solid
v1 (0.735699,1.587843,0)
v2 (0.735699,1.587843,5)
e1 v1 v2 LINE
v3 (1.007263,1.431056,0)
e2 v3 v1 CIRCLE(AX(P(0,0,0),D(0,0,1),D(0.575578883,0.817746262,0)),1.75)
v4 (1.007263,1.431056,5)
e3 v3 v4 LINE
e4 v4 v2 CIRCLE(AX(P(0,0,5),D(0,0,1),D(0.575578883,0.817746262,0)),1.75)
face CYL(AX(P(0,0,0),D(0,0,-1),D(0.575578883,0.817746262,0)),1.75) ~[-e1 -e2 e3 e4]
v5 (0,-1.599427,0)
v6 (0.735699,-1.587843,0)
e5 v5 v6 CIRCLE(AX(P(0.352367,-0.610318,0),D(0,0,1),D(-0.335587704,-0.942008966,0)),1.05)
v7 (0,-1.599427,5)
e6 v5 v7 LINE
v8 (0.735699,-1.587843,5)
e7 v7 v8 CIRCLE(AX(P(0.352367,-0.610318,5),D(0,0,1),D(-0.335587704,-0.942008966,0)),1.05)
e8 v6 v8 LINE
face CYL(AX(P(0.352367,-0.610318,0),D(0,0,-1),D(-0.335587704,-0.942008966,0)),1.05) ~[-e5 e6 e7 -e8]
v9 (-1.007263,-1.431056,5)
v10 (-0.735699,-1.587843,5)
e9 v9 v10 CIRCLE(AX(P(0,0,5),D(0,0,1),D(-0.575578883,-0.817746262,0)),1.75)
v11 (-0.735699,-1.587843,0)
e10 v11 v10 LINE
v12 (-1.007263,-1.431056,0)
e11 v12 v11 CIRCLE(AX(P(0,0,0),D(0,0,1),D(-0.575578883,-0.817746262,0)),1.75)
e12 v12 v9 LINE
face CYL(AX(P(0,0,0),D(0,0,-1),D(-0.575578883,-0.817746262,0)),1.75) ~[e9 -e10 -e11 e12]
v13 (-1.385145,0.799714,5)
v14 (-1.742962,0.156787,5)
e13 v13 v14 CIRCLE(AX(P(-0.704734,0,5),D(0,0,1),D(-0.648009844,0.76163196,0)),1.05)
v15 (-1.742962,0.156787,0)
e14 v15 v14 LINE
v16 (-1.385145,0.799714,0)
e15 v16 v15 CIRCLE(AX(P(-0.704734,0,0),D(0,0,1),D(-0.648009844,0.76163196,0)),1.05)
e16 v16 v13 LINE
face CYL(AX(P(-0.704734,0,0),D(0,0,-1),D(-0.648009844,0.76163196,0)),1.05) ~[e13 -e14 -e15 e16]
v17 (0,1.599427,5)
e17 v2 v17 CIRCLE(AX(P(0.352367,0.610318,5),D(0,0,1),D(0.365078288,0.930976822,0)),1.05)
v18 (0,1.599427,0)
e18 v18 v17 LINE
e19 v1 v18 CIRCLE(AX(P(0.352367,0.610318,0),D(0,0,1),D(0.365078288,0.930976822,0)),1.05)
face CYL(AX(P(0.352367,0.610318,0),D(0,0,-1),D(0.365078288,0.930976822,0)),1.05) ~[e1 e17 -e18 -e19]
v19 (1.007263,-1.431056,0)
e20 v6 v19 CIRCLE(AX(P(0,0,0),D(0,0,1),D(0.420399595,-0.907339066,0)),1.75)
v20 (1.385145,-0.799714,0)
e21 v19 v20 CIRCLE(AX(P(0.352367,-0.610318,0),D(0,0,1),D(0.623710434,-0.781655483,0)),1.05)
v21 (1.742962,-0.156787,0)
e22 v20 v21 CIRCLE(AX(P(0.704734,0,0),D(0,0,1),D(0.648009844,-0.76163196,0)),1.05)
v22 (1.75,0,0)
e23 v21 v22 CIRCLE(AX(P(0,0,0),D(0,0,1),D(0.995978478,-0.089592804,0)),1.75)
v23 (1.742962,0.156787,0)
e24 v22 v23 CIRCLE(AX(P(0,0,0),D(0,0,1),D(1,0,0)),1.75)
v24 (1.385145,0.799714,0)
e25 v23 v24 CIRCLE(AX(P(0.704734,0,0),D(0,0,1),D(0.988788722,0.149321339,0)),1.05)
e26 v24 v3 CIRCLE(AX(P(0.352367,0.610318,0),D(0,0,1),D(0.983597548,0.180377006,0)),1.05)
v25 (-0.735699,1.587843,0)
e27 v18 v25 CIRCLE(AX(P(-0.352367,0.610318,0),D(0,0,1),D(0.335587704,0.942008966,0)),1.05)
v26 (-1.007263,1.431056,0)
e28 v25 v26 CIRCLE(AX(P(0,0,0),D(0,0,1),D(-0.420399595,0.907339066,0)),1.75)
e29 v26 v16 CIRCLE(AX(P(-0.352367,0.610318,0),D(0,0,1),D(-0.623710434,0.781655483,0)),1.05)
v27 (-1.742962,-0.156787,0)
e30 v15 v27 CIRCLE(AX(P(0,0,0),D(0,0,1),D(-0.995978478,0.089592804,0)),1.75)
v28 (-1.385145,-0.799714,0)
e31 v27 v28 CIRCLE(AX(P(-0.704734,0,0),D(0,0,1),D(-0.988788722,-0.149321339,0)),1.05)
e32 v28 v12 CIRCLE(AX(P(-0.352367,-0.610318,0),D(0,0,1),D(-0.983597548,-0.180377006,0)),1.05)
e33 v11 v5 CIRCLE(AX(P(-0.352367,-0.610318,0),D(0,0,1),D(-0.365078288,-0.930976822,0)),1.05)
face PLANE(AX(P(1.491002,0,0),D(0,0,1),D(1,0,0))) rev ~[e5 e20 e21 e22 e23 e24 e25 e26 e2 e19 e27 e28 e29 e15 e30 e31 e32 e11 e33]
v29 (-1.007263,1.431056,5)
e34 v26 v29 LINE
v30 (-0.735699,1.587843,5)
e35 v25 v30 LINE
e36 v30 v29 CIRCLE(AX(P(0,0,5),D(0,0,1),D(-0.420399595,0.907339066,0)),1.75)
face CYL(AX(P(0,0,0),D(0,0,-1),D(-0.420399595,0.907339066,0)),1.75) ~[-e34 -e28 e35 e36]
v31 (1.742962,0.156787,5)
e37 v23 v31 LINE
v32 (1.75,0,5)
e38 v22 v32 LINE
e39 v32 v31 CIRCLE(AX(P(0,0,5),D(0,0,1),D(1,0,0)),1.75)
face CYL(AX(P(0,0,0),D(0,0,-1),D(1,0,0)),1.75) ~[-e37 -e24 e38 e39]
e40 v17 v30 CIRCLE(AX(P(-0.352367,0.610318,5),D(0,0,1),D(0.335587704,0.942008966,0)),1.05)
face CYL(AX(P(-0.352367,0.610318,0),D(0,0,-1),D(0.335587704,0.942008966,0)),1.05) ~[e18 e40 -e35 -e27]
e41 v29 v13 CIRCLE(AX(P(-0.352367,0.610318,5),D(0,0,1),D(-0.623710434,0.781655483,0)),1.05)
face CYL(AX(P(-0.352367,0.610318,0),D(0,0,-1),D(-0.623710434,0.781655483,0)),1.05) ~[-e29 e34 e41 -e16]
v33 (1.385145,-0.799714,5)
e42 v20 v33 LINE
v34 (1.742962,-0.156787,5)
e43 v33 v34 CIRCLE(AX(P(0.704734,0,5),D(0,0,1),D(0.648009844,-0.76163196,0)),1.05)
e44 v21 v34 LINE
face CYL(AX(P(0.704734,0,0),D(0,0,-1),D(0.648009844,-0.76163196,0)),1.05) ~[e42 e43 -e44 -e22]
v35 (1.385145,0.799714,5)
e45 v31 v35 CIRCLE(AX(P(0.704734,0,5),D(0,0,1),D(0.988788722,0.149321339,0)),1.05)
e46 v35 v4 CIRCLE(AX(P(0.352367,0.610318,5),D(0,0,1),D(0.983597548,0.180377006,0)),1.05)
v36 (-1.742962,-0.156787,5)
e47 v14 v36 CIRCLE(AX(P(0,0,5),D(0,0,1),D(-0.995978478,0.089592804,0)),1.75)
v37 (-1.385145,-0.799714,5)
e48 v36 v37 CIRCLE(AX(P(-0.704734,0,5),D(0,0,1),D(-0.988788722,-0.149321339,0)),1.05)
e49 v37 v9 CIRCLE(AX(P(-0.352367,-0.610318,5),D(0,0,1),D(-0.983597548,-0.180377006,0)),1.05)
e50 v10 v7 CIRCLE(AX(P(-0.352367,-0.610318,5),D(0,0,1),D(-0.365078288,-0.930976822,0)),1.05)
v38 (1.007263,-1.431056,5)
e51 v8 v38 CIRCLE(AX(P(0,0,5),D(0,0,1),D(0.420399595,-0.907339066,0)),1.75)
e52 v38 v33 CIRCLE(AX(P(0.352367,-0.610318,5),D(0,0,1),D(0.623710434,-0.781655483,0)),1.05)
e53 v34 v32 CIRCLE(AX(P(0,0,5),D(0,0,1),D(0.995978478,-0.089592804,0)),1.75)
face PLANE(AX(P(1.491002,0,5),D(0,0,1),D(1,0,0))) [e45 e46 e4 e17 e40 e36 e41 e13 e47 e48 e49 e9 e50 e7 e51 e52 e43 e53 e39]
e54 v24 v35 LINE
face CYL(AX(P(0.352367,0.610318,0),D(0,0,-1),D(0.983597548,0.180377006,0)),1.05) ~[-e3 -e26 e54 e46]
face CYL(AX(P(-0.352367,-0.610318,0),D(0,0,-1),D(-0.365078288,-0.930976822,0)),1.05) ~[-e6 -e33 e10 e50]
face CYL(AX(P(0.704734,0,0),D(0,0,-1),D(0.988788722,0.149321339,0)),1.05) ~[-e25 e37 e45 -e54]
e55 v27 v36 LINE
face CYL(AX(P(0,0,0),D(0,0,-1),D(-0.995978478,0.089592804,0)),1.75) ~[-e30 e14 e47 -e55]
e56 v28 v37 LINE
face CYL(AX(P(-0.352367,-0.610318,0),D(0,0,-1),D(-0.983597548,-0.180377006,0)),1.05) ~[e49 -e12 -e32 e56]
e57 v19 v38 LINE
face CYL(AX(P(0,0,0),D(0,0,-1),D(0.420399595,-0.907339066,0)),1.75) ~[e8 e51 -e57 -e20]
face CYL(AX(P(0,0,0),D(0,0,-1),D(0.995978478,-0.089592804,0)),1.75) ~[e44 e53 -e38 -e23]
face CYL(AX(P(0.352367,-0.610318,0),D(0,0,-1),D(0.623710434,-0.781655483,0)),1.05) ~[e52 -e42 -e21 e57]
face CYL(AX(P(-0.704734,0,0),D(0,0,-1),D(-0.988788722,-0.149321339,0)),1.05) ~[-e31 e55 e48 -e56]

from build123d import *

# Parameters (mm, degrees)
F1_DEPTH = 5


with BuildPart() as f1:
    # F0 (on Top) → F1 (new body)
    with BuildSketch(Plane.XY):
        with BuildLine():
            ThreePointArc((1.7429623373, -0.1567874062), (1.748239699, -0.0784726376), (1.75, 0))
            ThreePointArc((1.75, 0), (1.748239699, 0.0784726376), (1.7429623373, 0.1567874062))
            ThreePointArc((1.7429623373, 0.1567874062), (1.6222133761, 0.5106191558), (1.3851445143, 0.7997135582))
            ThreePointArc((1.3851445143, 0.7997135582), (1.3980525813, 0.7054063545), (1.4023670894, 0.6103177017))
            ThreePointArc((1.4023670894, 0.6103177017), (1.3522740733, 0.2898711016), (1.2067746637, 0))
            ThreePointArc((1.2067746637, 0), (1.3522740733, -0.2898711016), (1.4023670894, -0.6103177017))
            ThreePointArc((1.4023670894, -0.6103177017), (1.3980525813, -0.7054063545), (1.3851445143, -0.7997135582))
            ThreePointArc((1.3851445143, -0.7997135582), (1.6222133761, -0.5106191558), (1.7429623373, -0.1567874062))
        make_face()
        with BuildLine():
            ThreePointArc((1.3851445143, 0.7997135582), (1.2533158487, 1.1495684162), (1.0072630454, 1.4310559589))
            ThreePointArc((1.0072630454, 1.4310559589), (0.875, 1.5155444566), (0.7356992919, 1.587843365))
            ThreePointArc((0.7356992919, 1.587843365), (0.3688975274, 1.660187572), (0, 1.5994271164))
            ThreePointArc((0, 1.5994271164), (0.357996056, 1.3835474229), (0.6033873318, 1.0450975154))
            ThreePointArc((0.6033873318, 1.0450975154), (1.0191891876, 1.0018073904), (1.3851445143, 0.7997135582))
        make_face()
        with BuildLine():
            ThreePointArc((1.4023670894, 0.6103177017), (1.3980525813, 0.7054063545), (1.3851445143, 0.7997135582))
            ThreePointArc((1.3851445143, 0.7997135582), (1.0191891876, 1.0018073904), (0.6033873318, 1.0450975154))
            ThreePointArc((0.6033873318, 1.0450975154), (0.6738010602, 0.8327562974), (0.6976329106, 0.6103177017))
            ThreePointArc((0.6976329106, 0.6103177017), (0.6917287242, 0.4991244824), (0.6740825639, 0.3891817497))
            ThreePointArc((0.6740825639, 0.3891817497), (0.9717877583, 0.23751367), (1.2067746637, 0))
            ThreePointArc((1.2067746637, 0), (1.3522740733, 0.2898711016), (1.4023670894, 0.6103177017))
        make_face()
        with BuildLine():
            ThreePointArc((0.7356992919, -1.587843365), (0.875, -1.5155444566), (1.0072630454, -1.4310559589))
            ThreePointArc((1.0072630454, -1.4310559589), (1.2533158487, -1.1495684162), (1.3851445143, -0.7997135582))
            ThreePointArc((1.3851445143, -0.7997135582), (1.0191891876, -1.0018073904), (0.6033873318, -1.0450975154))
            ThreePointArc((0.6033873318, -1.0450975154), (0.357996056, -1.3835474229), (0, -1.5994271164))
            ThreePointArc((0, -1.5994271164), (0.3688975274, -1.660187572), (0.7356992919, -1.587843365))
        make_face()
        with BuildLine():
            ThreePointArc((0.6033873318, -1.0450975154), (1.0191891876, -1.0018073904), (1.3851445143, -0.7997135582))
            ThreePointArc((1.3851445143, -0.7997135582), (1.3980525813, -0.7054063545), (1.4023670894, -0.6103177017))
            ThreePointArc((1.4023670894, -0.6103177017), (1.3522740733, -0.2898711016), (1.2067746637, 0))
            ThreePointArc((1.2067746637, 0), (0.9717877583, -0.23751367), (0.6740825639, -0.3891817497))
            ThreePointArc((0.6740825639, -0.3891817497), (0.6917287242, -0.4991244824), (0.6976329106, -0.6103177017))
            ThreePointArc((0.6976329106, -0.6103177017), (0.6738010602, -0.8327562974), (0.6033873318, -1.0450975154))
        make_face()
        with BuildLine():
            ThreePointArc((0.6976329106, 0.6103177017), (0.6738010602, 0.8327562974), (0.6033873318, 1.0450975154))
            ThreePointArc((0.6033873318, 1.0450975154), (0.2802010071, 0.9603497208), (0, 0.7783634995))
            ThreePointArc((0, 0.7783634995), (0.143097193, 0.6194206689), (0.2510202425, 0.4347798137))
            ThreePointArc((0.2510202425, 0.4347798137), (0.4648854384, 0.4336361388), (0.6740825639, 0.3891817497))
            ThreePointArc((0.6740825639, 0.3891817497), (0.6917287242, 0.4991244824), (0.6976329106, 0.6103177017))
        make_face()
        with BuildLine():
            ThreePointArc((0, 0.7783634995), (0.2802010071, 0.9603497208), (0.6033873318, 1.0450975154))
            ThreePointArc((0.6033873318, 1.0450975154), (0.357996056, 1.3835474229), (0, 1.5994271164))
            ThreePointArc((0, 1.5994271164), (-0.357996056, 1.3835474229), (-0.6033873318, 1.0450975154))
            ThreePointArc((-0.6033873318, 1.0450975154), (-0.2802010071, 0.9603497208), (0, 0.7783634995))
        make_face()
        with BuildLine():
            ThreePointArc((0, -0.7783634995), (0.2802010071, -0.9603497208), (0.6033873318, -1.0450975154))
            ThreePointArc((0.6033873318, -1.0450975154), (0.6738010602, -0.8327562974), (0.6976329106, -0.6103177017))
            ThreePointArc((0.6976329106, -0.6103177017), (0.6917287242, -0.4991244824), (0.6740825639, -0.3891817497))
            ThreePointArc((0.6740825639, -0.3891817497), (0.4648854384, -0.4336361388), (0.2510202425, -0.4347798137))
            ThreePointArc((0.2510202425, -0.4347798137), (0.143097193, -0.6194206689), (0, -0.7783634995))
        make_face()
        with BuildLine():
            ThreePointArc((0, -1.5994271164), (0.357996056, -1.3835474229), (0.6033873318, -1.0450975154))
            ThreePointArc((0.6033873318, -1.0450975154), (0.2802010071, -0.9603497208), (0, -0.7783634995))
            ThreePointArc((0, -0.7783634995), (-0.2802010071, -0.9603497208), (-0.6033873318, -1.0450975154))
            ThreePointArc((-0.6033873318, -1.0450975154), (-0.357996056, -1.3835474229), (0, -1.5994271164))
        make_face()
        with BuildLine():
            ThreePointArc((0, 1.5994271164), (-0.3688975274, 1.660187572), (-0.7356992919, 1.587843365))
            ThreePointArc((-0.7356992919, 1.587843365), (-0.875, 1.5155444566), (-1.0072630454, 1.4310559589))
            ThreePointArc((-1.0072630454, 1.4310559589), (-1.2533158487, 1.1495684162), (-1.3851445143, 0.7997135582))
            ThreePointArc((-1.3851445143, 0.7997135582), (-1.0191891876, 1.0018073904), (-0.6033873318, 1.0450975154))
            ThreePointArc((-0.6033873318, 1.0450975154), (-0.357996056, 1.3835474229), (0, 1.5994271164))
        make_face()
        with BuildLine():
            ThreePointArc((-0.2510202425, 0.4347798137), (-0.143097193, 0.6194206689), (0, 0.7783634995))
            ThreePointArc((0, 0.7783634995), (-0.2802010071, 0.9603497208), (-0.6033873318, 1.0450975154))
            ThreePointArc((-0.6033873318, 1.0450975154), (-0.6915867512, 0.7228360507), (-0.6740825639, 0.3891817497))
            ThreePointArc((-0.6740825639, 0.3891817497), (-0.4648854384, 0.4336361388), (-0.2510202425, 0.4347798137))
        make_face()
        with BuildLine():
            ThreePointArc((0.2510202425, 0.4347798137), (0.143097193, 0.6194206689), (0, 0.7783634995))
            ThreePointArc((0, 0.7783634995), (-0.143097193, 0.6194206689), (-0.2510202425, 0.4347798137))
            ThreePointArc((-0.2510202425, 0.4347798137), (-0.1237894202, 0.4145004525), (0, 0.3787917131))
            ThreePointArc((0, 0.3787917131), (0.1237894202, 0.4145004525), (0.2510202425, 0.4347798137))
        make_face()
        with BuildLine():
            ThreePointArc((0.6740825639, -0.3891817497), (0.9717877583, -0.23751367), (1.2067746637, 0))
            ThreePointArc((1.2067746637, 0), (0.9717877583, 0.23751367), (0.6740825639, 0.3891817497))
            ThreePointArc((0.6740825639, 0.3891817497), (0.6079826314, 0.1857845301), (0.5020404849, 0))
            ThreePointArc((0.5020404849, 0), (0.6079826314, -0.1857845301), (0.6740825639, -0.3891817497))
        make_face()
        with BuildLine():
            ThreePointArc((-1.0072630454, -1.4310559589), (-0.875, -1.5155444566), (-0.7356992919, -1.587843365))
            ThreePointArc((-0.7356992919, -1.587843365), (-0.3688975274, -1.660187572), (0, -1.5994271164))
            ThreePointArc((0, -1.5994271164), (-0.357996056, -1.3835474229), (-0.6033873318, -1.0450975154))
            ThreePointArc((-0.6033873318, -1.0450975154), (-1.0191891876, -1.0018073904), (-1.3851445143, -0.7997135582))
            ThreePointArc((-1.3851445143, -0.7997135582), (-1.2533158487, -1.1495684162), (-1.0072630454, -1.4310559589))
        make_face()
        with BuildLine():
            ThreePointArc((-0.2510202425, -0.4347798137), (-0.143097193, -0.6194206689), (0, -0.7783634995))
            ThreePointArc((0, -0.7783634995), (0.143097193, -0.6194206689), (0.2510202425, -0.4347798137))
            ThreePointArc((0.2510202425, -0.4347798137), (0.1237894202, -0.4145004525), (0, -0.3787917131))
            ThreePointArc((0, -0.3787917131), (-0.1237894202, -0.4145004525), (-0.2510202425, -0.4347798137))
        make_face()
        with BuildLine():
            ThreePointArc((-0.6033873318, -1.0450975154), (-0.2802010071, -0.9603497208), (0, -0.7783634995))
            ThreePointArc((0, -0.7783634995), (-0.143097193, -0.6194206689), (-0.2510202425, -0.4347798137))
            ThreePointArc((-0.2510202425, -0.4347798137), (-0.4648854384, -0.4336361388), (-0.6740825639, -0.3891817497))
            ThreePointArc((-0.6740825639, -0.3891817497), (-0.6915867512, -0.7228360507), (-0.6033873318, -1.0450975154))
        make_face()
        with BuildLine():
            ThreePointArc((-0.6740825639, 0.3891817497), (-0.6915867512, 0.7228360507), (-0.6033873318, 1.0450975154))
            ThreePointArc((-0.6033873318, 1.0450975154), (-1.0191891876, 1.0018073904), (-1.3851445143, 0.7997135582))
            ThreePointArc((-1.3851445143, 0.7997135582), (-1.3771852436, 0.3817400325), (-1.2067746637, 0))
            ThreePointArc((-1.2067746637, 0), (-0.9717877583, 0.23751367), (-0.6740825639, 0.3891817497))
        make_face()
        with BuildLine():
            ThreePointArc((0.6740825639, 0.3891817497), (0.4648854384, 0.4336361388), (0.2510202425, 0.4347798137))
            ThreePointArc((0.2510202425, 0.4347798137), (0.2970732116, 0.3144550089), (0.3280432462, 0.1893958565))
            ThreePointArc((0.3280432462, 0.1893958565), (0.4208626318, 0.1000454436), (0.5020404849, 0))
            ThreePointArc((0.5020404849, 0), (0.6079826314, 0.1857845301), (0.6740825639, 0.3891817497))
        make_face()
        with BuildLine():
            ThreePointArc((0.3280432462, 0.1893958565), (0.2970732116, 0.3144550089), (0.2510202425, 0.4347798137))
            ThreePointArc((0.2510202425, 0.4347798137), (0.1237894202, 0.4145004525), (0, 0.3787917131))
            ThreePointArc((0, 0.3787917131), (0.1726329106, 0.2990089723), (0.3280432462, 0.1893958565))
        make_face()
        with BuildLine():
            ThreePointArc((-0.3280432462, 0.1893958565), (-0.2970732116, 0.3144550089), (-0.2510202425, 0.4347798137))
            ThreePointArc((-0.2510202425, 0.4347798137), (-0.4648854384, 0.4336361388), (-0.6740825639, 0.3891817497))
            ThreePointArc((-0.6740825639, 0.3891817497), (-0.6079826314, 0.1857845301), (-0.5020404849, 0))
            ThreePointArc((-0.5020404849, 0), (-0.4208626318, 0.1000454436), (-0.3280432462, 0.1893958565))
        make_face()
        with BuildLine():
            ThreePointArc((0, 0.3787917131), (-0.1237894202, 0.4145004525), (-0.2510202425, 0.4347798137))
            ThreePointArc((-0.2510202425, 0.4347798137), (-0.2970732116, 0.3144550089), (-0.3280432462, 0.1893958565))
            ThreePointArc((-0.3280432462, 0.1893958565), (-0.1726329106, 0.2990089723), (0, 0.3787917131))
        make_face()
        with BuildLine():
            ThreePointArc((0.2510202425, -0.4347798137), (0.4648854384, -0.4336361388), (0.6740825639, -0.3891817497))
            ThreePointArc((0.6740825639, -0.3891817497), (0.6079826314, -0.1857845301), (0.5020404849, 0))
            ThreePointArc((0.5020404849, 0), (0.4208626318, -0.1000454436), (0.3280432462, -0.1893958565))
            ThreePointArc((0.3280432462, -0.1893958565), (0.2970732116, -0.3144550089), (0.2510202425, -0.4347798137))
        make_face()
        with BuildLine():
            ThreePointArc((-1.3851445143, -0.7997135582), (-1.0191891876, -1.0018073904), (-0.6033873318, -1.0450975154))
            ThreePointArc((-0.6033873318, -1.0450975154), (-0.6915867512, -0.7228360507), (-0.6740825639, -0.3891817497))
            ThreePointArc((-0.6740825639, -0.3891817497), (-0.9717877583, -0.23751367), (-1.2067746637, 0))
            ThreePointArc((-1.2067746637, 0), (-1.3771852436, -0.3817400325), (-1.3851445143, -0.7997135582))
        make_face()
        with BuildLine():
            ThreePointArc((0, -0.3787917131), (0.1237894202, -0.4145004525), (0.2510202425, -0.4347798137))
            ThreePointArc((0.2510202425, -0.4347798137), (0.2970732116, -0.3144550089), (0.3280432462, -0.1893958565))
            ThreePointArc((0.3280432462, -0.1893958565), (0.1726329106, -0.2990089723), (0, -0.3787917131))
        make_face()
        with BuildLine():
            ThreePointArc((-0.6740825639, -0.3891817497), (-0.4648854384, -0.4336361388), (-0.2510202425, -0.4347798137))
            ThreePointArc((-0.2510202425, -0.4347798137), (-0.2970732116, -0.3144550089), (-0.3280432462, -0.1893958565))
            ThreePointArc((-0.3280432462, -0.1893958565), (-0.4208626318, -0.1000454436), (-0.5020404849, 0))
            ThreePointArc((-0.5020404849, 0), (-0.6079826314, -0.1857845301), (-0.6740825639, -0.3891817497))
        make_face()
        with BuildLine():
            ThreePointArc((-0.3280432462, -0.1893958565), (-0.2970732116, -0.3144550089), (-0.2510202425, -0.4347798137))
            ThreePointArc((-0.2510202425, -0.4347798137), (-0.1237894202, -0.4145004525), (0, -0.3787917131))
            ThreePointArc((0, -0.3787917131), (-0.1726329106, -0.2990089723), (-0.3280432462, -0.1893958565))
        make_face()
        with BuildLine():
            ThreePointArc((-1.3851445143, 0.7997135582), (-1.6222133761, 0.5106191558), (-1.7429623373, 0.1567874062))
            ThreePointArc((-1.7429623373, 0.1567874062), (-1.75, 0), (-1.7429623373, -0.1567874062))
            ThreePointArc((-1.7429623373, -0.1567874062), (-1.6222133761, -0.5106191558), (-1.3851445143, -0.7997135582))
            ThreePointArc((-1.3851445143, -0.7997135582), (-1.3771852436, -0.3817400325), (-1.2067746637, 0))
            ThreePointArc((-1.2067746637, 0), (-1.3771852436, 0.3817400325), (-1.3851445143, 0.7997135582))
        make_face()
        with BuildLine():
            ThreePointArc((-0.5020404849, 0), (-0.6079826314, 0.1857845301), (-0.6740825639, 0.3891817497))
            ThreePointArc((-0.6740825639, 0.3891817497), (-0.9717877583, 0.23751367), (-1.2067746637, 0))
            ThreePointArc((-1.2067746637, 0), (-0.9717877583, -0.23751367), (-0.6740825639, -0.3891817497))
            ThreePointArc((-0.6740825639, -0.3891817497), (-0.6079826314, -0.1857845301), (-0.5020404849, 0))
        make_face()
        with BuildLine():
            ThreePointArc((0.5020404849, 0), (0.4208626318, 0.1000454436), (0.3280432462, 0.1893958565))
            ThreePointArc((0.3280432462, 0.1893958565), (0.3409513132, 0.0950886528), (0.3452658213, 0))
            ThreePointArc((0.3452658213, 0), (0.3409513132, -0.0950886528), (0.3280432462, -0.1893958565))
            ThreePointArc((0.3280432462, -0.1893958565), (0.4208626318, -0.1000454436), (0.5020404849, 0))
        make_face()
        with BuildLine():
            ThreePointArc((0.3452658213, 0), (0.3409513132, 0.0950886528), (0.3280432462, 0.1893958565))
            ThreePointArc((0.3280432462, 0.1893958565), (0.1726329106, 0.2990089723), (0, 0.3787917131))
            ThreePointArc((0, 0.3787917131), (-0.1726329106, 0.2990089723), (-0.3280432462, 0.1893958565))
            ThreePointArc((-0.3280432462, 0.1893958565), (-0.3452658213, 0), (-0.3280432462, -0.1893958565))
            ThreePointArc((-0.3280432462, -0.1893958565), (-0.1726329106, -0.2990089723), (0, -0.3787917131))
            ThreePointArc((0, -0.3787917131), (0.1726329106, -0.2990089723), (0.3280432462, -0.1893958565))
            ThreePointArc((0.3280432462, -0.1893958565), (0.3409513132, -0.0950886528), (0.3452658213, 0))
        make_face()
        with BuildLine():
            ThreePointArc((-0.3280432462, -0.1893958565), (-0.3452658213, 0), (-0.3280432462, 0.1893958565))
            ThreePointArc((-0.3280432462, 0.1893958565), (-0.4208626318, 0.1000454436), (-0.5020404849, 0))
            ThreePointArc((-0.5020404849, 0), (-0.4208626318, -0.1000454436), (-0.3280432462, -0.1893958565))
        make_face()
    extrude(amount=F1_DEPTH)


solid = f1.part
